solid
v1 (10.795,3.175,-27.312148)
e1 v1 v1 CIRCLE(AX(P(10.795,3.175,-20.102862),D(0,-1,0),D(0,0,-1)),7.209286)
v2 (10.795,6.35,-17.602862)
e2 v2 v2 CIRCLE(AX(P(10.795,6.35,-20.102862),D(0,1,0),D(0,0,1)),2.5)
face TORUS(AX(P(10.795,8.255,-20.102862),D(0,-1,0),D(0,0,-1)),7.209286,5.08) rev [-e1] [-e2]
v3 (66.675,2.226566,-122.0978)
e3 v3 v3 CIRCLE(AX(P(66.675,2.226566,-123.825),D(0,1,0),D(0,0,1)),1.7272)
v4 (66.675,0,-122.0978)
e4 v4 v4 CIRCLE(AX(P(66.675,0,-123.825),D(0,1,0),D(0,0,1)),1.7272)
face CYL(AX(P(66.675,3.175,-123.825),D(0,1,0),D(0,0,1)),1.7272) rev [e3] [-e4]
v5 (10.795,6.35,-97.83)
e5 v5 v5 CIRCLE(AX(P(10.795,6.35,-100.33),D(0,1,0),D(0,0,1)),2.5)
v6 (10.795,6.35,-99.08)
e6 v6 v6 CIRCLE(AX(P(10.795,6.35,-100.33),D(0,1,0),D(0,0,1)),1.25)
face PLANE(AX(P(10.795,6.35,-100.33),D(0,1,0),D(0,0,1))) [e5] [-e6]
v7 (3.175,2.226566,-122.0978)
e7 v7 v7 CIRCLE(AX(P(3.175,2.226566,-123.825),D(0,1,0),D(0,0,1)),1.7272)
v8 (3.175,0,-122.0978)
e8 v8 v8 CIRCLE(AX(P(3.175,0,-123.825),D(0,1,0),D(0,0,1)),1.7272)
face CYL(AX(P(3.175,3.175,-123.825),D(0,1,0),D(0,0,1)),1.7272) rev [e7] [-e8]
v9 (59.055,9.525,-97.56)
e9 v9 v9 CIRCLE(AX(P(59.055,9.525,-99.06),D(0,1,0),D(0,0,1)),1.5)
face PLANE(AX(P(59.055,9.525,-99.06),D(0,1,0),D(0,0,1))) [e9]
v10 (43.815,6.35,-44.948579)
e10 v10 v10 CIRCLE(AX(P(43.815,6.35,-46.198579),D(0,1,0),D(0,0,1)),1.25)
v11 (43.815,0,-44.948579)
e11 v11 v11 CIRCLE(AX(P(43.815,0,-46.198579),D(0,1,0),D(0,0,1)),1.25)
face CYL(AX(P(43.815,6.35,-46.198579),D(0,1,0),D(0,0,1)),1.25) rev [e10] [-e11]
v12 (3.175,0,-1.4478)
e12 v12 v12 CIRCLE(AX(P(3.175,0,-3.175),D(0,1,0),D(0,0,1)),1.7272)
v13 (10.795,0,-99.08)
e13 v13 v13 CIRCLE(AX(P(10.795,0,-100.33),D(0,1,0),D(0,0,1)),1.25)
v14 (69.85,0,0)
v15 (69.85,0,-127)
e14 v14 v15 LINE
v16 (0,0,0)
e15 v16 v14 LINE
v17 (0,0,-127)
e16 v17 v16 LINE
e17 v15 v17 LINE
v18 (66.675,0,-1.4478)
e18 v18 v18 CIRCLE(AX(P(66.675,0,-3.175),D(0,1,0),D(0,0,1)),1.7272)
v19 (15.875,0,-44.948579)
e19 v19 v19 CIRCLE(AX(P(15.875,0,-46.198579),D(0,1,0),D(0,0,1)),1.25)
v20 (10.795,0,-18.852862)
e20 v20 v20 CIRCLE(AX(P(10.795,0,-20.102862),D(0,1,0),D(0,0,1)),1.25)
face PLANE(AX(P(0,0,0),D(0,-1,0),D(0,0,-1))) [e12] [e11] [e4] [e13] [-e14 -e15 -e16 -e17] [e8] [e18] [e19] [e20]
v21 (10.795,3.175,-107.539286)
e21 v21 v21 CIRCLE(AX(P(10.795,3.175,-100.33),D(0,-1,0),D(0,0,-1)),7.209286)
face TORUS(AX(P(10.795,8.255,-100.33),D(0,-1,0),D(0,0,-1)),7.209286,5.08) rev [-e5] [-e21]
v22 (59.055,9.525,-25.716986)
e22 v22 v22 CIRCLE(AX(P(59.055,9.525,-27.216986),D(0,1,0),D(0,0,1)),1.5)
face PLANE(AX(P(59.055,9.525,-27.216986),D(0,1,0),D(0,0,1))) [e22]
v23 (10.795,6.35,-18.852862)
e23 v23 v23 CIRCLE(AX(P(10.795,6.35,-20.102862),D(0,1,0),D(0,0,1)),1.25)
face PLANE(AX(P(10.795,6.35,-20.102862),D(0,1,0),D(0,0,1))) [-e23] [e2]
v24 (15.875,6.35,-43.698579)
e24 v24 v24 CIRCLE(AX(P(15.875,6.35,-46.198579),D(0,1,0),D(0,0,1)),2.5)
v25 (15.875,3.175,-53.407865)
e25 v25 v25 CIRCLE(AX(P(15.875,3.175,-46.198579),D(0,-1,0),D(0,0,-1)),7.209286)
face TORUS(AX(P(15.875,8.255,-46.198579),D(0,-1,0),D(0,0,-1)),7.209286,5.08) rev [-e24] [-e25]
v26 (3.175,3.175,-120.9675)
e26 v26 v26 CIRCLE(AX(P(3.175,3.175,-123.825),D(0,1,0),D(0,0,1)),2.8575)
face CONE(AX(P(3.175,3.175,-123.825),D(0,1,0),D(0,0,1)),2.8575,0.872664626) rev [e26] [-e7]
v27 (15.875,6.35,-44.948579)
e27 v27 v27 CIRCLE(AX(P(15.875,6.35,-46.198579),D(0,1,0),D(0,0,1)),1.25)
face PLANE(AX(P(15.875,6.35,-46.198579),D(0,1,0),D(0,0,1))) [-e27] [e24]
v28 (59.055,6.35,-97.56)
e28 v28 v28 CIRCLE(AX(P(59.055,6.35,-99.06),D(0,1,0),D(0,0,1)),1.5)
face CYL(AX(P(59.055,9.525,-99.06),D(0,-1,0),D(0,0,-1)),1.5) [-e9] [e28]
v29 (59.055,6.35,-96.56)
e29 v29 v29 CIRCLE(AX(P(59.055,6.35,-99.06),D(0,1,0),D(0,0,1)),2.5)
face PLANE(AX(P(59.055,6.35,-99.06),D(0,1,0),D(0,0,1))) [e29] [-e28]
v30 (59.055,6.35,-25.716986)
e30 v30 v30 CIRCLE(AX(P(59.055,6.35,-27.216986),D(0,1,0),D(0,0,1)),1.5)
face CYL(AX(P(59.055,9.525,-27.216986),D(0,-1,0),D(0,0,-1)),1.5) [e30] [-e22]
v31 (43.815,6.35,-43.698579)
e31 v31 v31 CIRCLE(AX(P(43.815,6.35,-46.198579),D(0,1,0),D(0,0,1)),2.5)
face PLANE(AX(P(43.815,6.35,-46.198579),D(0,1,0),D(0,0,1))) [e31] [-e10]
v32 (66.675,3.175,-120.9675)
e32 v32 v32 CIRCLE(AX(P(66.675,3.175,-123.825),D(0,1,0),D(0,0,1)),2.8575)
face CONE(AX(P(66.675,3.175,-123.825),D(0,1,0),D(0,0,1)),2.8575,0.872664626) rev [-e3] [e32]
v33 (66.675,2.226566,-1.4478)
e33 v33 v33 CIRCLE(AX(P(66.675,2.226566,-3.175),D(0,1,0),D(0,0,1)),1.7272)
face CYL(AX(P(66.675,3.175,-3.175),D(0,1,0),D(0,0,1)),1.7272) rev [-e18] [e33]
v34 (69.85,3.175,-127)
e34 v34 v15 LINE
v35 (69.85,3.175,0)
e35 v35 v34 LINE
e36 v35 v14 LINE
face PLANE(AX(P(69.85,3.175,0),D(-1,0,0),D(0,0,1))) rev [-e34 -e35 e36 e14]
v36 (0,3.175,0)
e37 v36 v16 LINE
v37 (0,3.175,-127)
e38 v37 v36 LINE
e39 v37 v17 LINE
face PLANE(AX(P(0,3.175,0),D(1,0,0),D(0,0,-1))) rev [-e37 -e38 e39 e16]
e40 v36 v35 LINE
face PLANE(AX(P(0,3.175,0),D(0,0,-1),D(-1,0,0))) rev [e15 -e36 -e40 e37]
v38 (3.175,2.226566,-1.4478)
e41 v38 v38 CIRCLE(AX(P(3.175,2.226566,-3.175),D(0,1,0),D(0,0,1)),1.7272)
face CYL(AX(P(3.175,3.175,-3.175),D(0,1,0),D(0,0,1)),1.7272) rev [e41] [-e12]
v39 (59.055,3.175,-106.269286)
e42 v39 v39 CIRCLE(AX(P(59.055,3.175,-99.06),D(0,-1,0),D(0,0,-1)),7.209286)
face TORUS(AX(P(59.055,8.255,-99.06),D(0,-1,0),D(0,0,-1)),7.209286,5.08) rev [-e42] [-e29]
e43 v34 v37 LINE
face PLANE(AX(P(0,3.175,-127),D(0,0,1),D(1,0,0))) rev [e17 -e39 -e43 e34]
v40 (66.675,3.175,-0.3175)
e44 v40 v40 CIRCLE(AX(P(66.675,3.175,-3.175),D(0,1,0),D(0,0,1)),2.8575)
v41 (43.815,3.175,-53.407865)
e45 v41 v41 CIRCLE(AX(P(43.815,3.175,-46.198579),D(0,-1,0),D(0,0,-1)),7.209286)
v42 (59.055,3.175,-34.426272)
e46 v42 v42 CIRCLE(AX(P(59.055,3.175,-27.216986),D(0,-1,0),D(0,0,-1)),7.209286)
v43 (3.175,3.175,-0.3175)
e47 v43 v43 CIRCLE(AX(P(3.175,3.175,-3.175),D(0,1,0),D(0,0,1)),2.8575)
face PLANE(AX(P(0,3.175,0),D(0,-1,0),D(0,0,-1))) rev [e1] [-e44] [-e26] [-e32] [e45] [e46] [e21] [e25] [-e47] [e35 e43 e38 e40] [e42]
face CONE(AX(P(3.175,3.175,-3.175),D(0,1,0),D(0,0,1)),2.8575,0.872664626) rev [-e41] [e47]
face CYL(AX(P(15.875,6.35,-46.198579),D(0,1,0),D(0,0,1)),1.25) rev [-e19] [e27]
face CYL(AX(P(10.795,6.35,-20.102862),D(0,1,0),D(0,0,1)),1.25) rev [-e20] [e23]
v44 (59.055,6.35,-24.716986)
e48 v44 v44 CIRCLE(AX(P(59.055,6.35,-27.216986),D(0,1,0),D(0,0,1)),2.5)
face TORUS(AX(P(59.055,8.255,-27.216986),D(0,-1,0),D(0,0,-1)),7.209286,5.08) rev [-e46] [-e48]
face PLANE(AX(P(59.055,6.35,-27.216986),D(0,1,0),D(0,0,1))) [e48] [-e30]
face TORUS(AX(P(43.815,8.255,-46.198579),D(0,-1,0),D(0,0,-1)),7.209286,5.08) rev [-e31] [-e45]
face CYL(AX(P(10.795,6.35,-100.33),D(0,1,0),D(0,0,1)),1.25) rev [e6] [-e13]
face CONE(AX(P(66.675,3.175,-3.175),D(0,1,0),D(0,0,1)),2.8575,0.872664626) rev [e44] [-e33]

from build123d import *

# Parameters (mm, degrees)
SKETCH1_W                                         = 69.85
SKETCH1_H                                         = 127
BOSS_EXTRUDE1_DEPTH                               = 3.175
SKETCH2_R                                         = 2.5
BOSS_EXTRUDE2_DEPTH                               = 3.175
M3X0_5_TAPPED_HOLE1_D                             = 2.5
SKETCH5_R                                         = 1.5
BOSS_EXTRUDE3_DEPTH                               = 3.175
CSK_FOR_4_FLAT_HEAD_MACHINE_SCREW_100_D           = 3.4544
CSK_FOR_4_FLAT_HEAD_MACHINE_SCREW_100_CSINK_D     = 5.715
CSK_FOR_4_FLAT_HEAD_MACHINE_SCREW_100_CSINK_ANGLE = 100
FILLET1_R                                         = 5.08


with BuildPart() as part:
    # Sketch1 → Boss-Extrude1 (new body)
    with BuildSketch(Plane(origin=(0, 0, 0), x_dir=(1, 0, 0), z_dir=(0, 1, 0))):
        with Locations((34.925, 63.5)):
            Rectangle(SKETCH1_W, SKETCH1_H)
    extrude(amount=BOSS_EXTRUDE1_DEPTH)

    # Sketch2 → Boss-Extrude2 (add)
    with BuildSketch(Plane(origin=(0, 3.175, 0), x_dir=(1, 0, 0), z_dir=(0, 1, 0))):
        with Locations(Location((10.795, 100.33, 0), (0, 0, 90))):
            Circle(SKETCH2_R)
        with Locations(Location((59.055, 99.06, 0), (0, 0, 90))):
            Circle(SKETCH2_R)
        with Locations(Location((15.875, 46.19857895, 0), (0, 0, 90))):
            Circle(SKETCH2_R)
        with Locations(Location((43.815, 46.19857895, 0), (0, 0, 90))):
            Circle(SKETCH2_R)
        with Locations(Location((10.795, 20.102862456, 0), (0, 0, 90))):
            Circle(SKETCH2_R)
        with Locations(Location((59.055, 27.216985797, 0), (0, 0, 90))):
            Circle(SKETCH2_R)
    extrude(amount=BOSS_EXTRUDE2_DEPTH)

    # M3x0.5 Tapped Hole1 (through all)
    with Locations(Plane(origin=(0, 6.35, 0), x_dir=(1, 0, 0), z_dir=(0, 1, 0))):
        with Locations((10.795, 100.33), (15.875, 46.19857895), (43.815, 46.19857895), (10.795, 20.102862456)):
            Hole(M3X0_5_TAPPED_HOLE1_D / 2)

    # Sketch5 → Boss-Extrude3 (add)
    with BuildSketch(Plane(origin=(0, 6.35, 0), x_dir=(1, 0, 0), z_dir=(0, 1, 0))):
        with Locations(Location((59.055, 99.06, 0), (0, 0, 270))):
            Circle(SKETCH5_R)
        with Locations(Location((59.055, 27.216985797, 0), (0, 0, 270))):
            Circle(SKETCH5_R)
    extrude(amount=BOSS_EXTRUDE3_DEPTH)

    # CSK for #4 Flat Head Machine Screw (100)1 (through all)
    with Locations(Plane(origin=(0, 3.175, 0), x_dir=(1, 0, 0), z_dir=(0, 1, 0))):
        with Locations((3.175, 123.825), (66.675, 123.825), (66.675, 3.175), (3.175, 3.175)):
            CounterSinkHole(CSK_FOR_4_FLAT_HEAD_MACHINE_SCREW_100_D / 2, CSK_FOR_4_FLAT_HEAD_MACHINE_SCREW_100_CSINK_D / 2, counter_sink_angle=CSK_FOR_4_FLAT_HEAD_MACHINE_SCREW_100_CSINK_ANGLE)

    # Fillet1
    # the kernel refuses this fillet: 5.08 mm, written as the material it adds along each edge
    with BuildSketch(Plane(origin=(10.795, 3.175, -100.33), x_dir=(0, 0, -1), z_dir=(1, 0, 0))) as fillet1_piece_1:
        with BuildLine():
            CenterArc((7.209286039, 5.08), FILLET1_R, 202.024312837, 67.975687163)
            Line((2.5, 3.175), (2.405814279, 3.1369))
            ThreePointArc((2.405814279, 3.1369), (2.3984, 1.5875), (2.3984, 0))
            Line((2.3984, 0), (2.5, -0.1016))
            Line((2.5, -0.1016), (7.209286039, -0.1016))
            Line((7.209286039, -0.1016), (7.209286039, 0))
        make_face()
    revolve(axis=Axis((10.795, 3.175, -100.33), (0, 1, 0)))
    with BuildSketch(Plane(origin=(59.055, 3.175, -99.06), x_dir=(0, 0, -1), z_dir=(1, 0, 0))) as fillet1_piece_2:
        with BuildLine():
            CenterArc((7.209286039, 5.08), FILLET1_R, 202.024312837, 67.975687163)
            Line((2.5, 3.175), (2.405814279, 3.1369))
            ThreePointArc((2.405814279, 3.1369), (2.3984, 1.5875), (2.3984, 0))
            Line((2.3984, 0), (2.5, -0.1016))
            Line((2.5, -0.1016), (7.209286039, -0.1016))
            Line((7.209286039, -0.1016), (7.209286039, 0))
        make_face()
    revolve(axis=Axis((59.055, 3.175, -99.06), (0, 1, 0)))
    with BuildSketch(Plane(origin=(15.875, 3.175, -46.19857895), x_dir=(0, 0, -1), z_dir=(1, 0, 0))) as fillet1_piece_3:
        with BuildLine():
            CenterArc((7.209286039, 5.08), FILLET1_R, 202.024312837, 67.975687163)
            Line((2.5, 3.175), (2.405814279, 3.1369))
            ThreePointArc((2.405814279, 3.1369), (2.3984, 1.5875), (2.3984, 0))
            Line((2.3984, 0), (2.5, -0.1016))
            Line((2.5, -0.1016), (7.209286039, -0.1016))
            Line((7.209286039, -0.1016), (7.209286039, 0))
        make_face()
    revolve(axis=Axis((15.875, 3.175, -46.19857895), (0, 1, 0)))
    with BuildSketch(Plane(origin=(43.815, 3.175, -46.19857895), x_dir=(0, 0, -1), z_dir=(1, 0, 0))) as fillet1_piece_4:
        with BuildLine():
            CenterArc((7.209286039, 5.08), FILLET1_R, 202.024312837, 67.975687163)
            Line((2.5, 3.175), (2.405814279, 3.1369))
            ThreePointArc((2.405814279, 3.1369), (2.3984, 1.5875), (2.3984, 0))
            Line((2.3984, 0), (2.5, -0.1016))
            Line((2.5, -0.1016), (7.209286039, -0.1016))
            Line((7.209286039, -0.1016), (7.209286039, 0))
        make_face()
    revolve(axis=Axis((43.815, 3.175, -46.19857895), (0, 1, 0)))
    with BuildSketch(Plane(origin=(10.795, 3.175, -20.102862456), x_dir=(0, 0, -1), z_dir=(1, 0, 0))) as fillet1_piece_5:
        with BuildLine():
            CenterArc((7.209286039, 5.08), FILLET1_R, 202.024312837, 67.975687163)
            Line((2.5, 3.175), (2.405814279, 3.1369))
            ThreePointArc((2.405814279, 3.1369), (2.3984, 1.5875), (2.3984, 0))
            Line((2.3984, 0), (2.5, -0.1016))
            Line((2.5, -0.1016), (7.209286039, -0.1016))
            Line((7.209286039, -0.1016), (7.209286039, 0))
        make_face()
    revolve(axis=Axis((10.795, 3.175, -20.102862456), (0, 1, 0)))
    with BuildSketch(Plane(origin=(59.055, 3.175, -27.216985797), x_dir=(0, 0, -1), z_dir=(1, 0, 0))) as fillet1_piece_6:
        with BuildLine():
            CenterArc((7.209286039, 5.08), FILLET1_R, 202.024312837, 67.975687163)
            Line((2.5, 3.175), (2.405814279, 3.1369))
            ThreePointArc((2.405814279, 3.1369), (2.3984, 1.5875), (2.3984, 0))
            Line((2.3984, 0), (2.5, -0.1016))
            Line((2.5, -0.1016), (7.209286039, -0.1016))
            Line((7.209286039, -0.1016), (7.209286039, 0))
        make_face()
    revolve(axis=Axis((59.055, 3.175, -27.216985797), (0, 1, 0)))


solid = part.part
